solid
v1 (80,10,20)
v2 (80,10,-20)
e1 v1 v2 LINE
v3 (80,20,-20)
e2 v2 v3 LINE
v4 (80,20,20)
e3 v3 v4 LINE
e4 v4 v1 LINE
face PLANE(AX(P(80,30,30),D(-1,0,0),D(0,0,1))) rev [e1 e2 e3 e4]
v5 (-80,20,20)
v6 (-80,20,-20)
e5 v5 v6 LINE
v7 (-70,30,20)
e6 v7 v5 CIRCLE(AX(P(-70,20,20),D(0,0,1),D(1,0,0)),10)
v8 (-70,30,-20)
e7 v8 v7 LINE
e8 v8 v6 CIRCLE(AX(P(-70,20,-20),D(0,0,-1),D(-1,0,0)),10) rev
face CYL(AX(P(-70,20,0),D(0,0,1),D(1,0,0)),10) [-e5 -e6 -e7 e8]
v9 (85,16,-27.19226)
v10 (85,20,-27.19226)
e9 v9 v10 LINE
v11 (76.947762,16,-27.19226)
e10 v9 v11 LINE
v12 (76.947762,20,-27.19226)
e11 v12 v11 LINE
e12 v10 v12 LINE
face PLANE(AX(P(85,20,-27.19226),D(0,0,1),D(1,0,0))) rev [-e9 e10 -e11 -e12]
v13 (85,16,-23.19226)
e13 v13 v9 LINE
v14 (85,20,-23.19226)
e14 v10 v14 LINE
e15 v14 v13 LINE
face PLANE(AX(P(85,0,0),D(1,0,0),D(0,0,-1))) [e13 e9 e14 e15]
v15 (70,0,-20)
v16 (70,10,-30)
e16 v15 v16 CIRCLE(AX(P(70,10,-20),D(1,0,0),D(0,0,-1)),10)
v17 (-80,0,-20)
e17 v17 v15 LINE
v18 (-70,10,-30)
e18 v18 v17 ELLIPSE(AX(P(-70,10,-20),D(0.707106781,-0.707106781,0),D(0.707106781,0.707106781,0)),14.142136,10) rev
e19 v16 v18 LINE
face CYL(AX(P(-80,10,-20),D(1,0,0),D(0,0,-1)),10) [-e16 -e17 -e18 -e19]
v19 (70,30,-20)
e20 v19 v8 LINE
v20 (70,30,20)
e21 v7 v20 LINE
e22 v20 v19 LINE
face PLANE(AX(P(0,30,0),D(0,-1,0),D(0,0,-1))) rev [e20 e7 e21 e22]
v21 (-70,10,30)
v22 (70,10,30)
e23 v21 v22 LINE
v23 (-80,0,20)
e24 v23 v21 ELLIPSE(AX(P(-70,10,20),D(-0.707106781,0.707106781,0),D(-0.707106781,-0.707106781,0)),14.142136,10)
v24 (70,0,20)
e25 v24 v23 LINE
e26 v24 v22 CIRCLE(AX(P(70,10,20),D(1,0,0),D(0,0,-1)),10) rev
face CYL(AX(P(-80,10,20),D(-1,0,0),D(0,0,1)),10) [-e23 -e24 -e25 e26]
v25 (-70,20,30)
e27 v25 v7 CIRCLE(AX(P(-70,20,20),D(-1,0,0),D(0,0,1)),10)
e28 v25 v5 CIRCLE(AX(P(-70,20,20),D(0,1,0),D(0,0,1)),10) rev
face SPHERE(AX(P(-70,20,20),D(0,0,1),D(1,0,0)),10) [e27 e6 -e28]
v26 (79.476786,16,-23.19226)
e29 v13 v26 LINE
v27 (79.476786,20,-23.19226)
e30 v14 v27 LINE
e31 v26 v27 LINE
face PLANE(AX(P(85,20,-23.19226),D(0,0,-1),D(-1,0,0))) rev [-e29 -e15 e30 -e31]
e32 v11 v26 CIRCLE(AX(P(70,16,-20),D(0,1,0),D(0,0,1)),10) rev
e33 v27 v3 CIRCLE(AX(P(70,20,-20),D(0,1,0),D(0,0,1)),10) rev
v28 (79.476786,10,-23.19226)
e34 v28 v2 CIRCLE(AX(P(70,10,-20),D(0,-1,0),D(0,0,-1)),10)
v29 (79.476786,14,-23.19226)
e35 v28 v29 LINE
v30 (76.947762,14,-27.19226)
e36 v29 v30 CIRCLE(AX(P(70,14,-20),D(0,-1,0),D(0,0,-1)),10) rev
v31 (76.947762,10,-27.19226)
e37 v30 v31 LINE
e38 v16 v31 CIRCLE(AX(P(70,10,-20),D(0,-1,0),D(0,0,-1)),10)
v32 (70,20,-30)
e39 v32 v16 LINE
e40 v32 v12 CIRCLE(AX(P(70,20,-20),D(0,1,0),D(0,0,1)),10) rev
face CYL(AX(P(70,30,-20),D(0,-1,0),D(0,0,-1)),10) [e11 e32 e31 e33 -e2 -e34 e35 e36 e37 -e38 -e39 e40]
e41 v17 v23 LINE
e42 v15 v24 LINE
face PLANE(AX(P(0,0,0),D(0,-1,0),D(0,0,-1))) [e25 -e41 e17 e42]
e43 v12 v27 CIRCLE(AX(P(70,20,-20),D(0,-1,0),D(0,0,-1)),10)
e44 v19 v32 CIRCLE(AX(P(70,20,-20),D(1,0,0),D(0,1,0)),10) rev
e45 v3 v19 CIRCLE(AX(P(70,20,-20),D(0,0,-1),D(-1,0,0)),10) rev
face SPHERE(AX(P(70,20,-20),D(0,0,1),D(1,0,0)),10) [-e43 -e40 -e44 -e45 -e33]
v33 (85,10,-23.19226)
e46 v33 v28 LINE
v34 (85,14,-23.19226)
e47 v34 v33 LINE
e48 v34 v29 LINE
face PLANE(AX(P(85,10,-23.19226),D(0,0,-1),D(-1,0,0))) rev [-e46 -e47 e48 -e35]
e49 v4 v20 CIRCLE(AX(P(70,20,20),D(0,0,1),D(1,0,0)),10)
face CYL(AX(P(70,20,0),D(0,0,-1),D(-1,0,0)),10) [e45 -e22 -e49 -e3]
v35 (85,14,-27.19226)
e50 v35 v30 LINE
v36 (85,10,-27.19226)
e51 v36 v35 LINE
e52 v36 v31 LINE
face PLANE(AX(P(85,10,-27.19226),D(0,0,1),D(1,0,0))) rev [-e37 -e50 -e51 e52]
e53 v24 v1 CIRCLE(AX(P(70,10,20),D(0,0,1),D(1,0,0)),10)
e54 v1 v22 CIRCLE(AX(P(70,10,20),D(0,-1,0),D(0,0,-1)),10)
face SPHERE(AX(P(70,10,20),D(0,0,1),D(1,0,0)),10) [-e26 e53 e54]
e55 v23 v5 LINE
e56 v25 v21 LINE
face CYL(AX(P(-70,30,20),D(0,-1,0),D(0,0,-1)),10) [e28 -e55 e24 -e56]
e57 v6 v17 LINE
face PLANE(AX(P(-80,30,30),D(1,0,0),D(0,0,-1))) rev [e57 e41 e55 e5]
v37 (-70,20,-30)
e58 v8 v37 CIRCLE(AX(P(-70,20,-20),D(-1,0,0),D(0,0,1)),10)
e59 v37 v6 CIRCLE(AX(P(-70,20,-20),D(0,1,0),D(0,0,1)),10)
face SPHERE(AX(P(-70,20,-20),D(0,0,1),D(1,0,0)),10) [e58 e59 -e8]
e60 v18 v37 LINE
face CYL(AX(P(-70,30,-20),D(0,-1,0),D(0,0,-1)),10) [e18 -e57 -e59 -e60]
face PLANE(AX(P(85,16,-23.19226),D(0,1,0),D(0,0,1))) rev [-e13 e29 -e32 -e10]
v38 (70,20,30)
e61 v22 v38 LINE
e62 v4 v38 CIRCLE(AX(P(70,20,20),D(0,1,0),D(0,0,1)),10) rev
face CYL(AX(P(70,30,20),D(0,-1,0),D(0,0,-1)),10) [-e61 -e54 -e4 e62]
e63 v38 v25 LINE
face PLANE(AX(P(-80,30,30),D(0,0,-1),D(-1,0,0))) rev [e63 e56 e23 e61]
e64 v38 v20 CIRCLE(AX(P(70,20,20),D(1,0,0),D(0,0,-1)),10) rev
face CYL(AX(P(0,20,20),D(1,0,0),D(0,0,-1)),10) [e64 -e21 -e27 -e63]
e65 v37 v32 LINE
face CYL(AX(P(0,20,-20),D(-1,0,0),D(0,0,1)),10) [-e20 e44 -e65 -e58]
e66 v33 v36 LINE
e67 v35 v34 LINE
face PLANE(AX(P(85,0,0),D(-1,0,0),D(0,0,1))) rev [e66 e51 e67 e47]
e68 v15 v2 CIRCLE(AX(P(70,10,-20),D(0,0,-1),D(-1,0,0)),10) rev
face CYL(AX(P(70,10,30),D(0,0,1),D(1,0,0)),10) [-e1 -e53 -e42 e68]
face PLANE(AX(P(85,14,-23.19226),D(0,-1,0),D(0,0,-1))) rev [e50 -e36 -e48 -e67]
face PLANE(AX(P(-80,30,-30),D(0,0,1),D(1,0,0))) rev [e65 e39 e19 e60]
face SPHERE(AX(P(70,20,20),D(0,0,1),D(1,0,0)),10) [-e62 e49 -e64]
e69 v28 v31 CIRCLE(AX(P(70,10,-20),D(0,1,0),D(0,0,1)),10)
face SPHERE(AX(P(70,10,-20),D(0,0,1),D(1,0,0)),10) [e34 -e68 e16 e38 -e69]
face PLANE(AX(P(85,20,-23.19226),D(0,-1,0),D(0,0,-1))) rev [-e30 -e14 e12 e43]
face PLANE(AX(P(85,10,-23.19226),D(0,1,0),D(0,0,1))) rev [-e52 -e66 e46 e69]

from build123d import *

# Parameters (mm, degrees)
ESQUISSE1_W        = 160
ESQUISSE1_H        = 60
BOSS_EXTRU_1_DEPTH = 30
ESQUISSE2_W        = 4
ESQUISSE2_H        = 4
BOSS_EXTRU_2_DEPTH = 5
CONG_1_R           = 10


with BuildPart() as part:
    # Esquisse1 → Boss.-Extru.1 (new body)
    with BuildSketch(Plane(origin=(0, 0, 0), x_dir=(1, 0, 0), z_dir=(0, 1, 0))):
        Rectangle(ESQUISSE1_W, ESQUISSE1_H)
    extrude(amount=BOSS_EXTRU_1_DEPTH)

    # Esquisse2 → Boss.-Extru.2 (add)
    with BuildSketch(Plane(origin=(80, 0, 0), x_dir=(0, 0, -1), z_dir=(1, 0, 0))):
        with Locations((25.192260315, 18)):
            Rectangle(ESQUISSE2_W, ESQUISSE2_H)
        with Locations((25.192260315, 12)):
            Rectangle(ESQUISSE2_W, ESQUISSE2_H)
    extrude(amount=BOSS_EXTRU_2_DEPTH)

    # Congé1
    # the kernel refuses this fillet: 10 mm, written as the material it takes off along each edge
    with BuildSketch(Plane(origin=(-70, 20, 20), x_dir=(-1, 0, 0), z_dir=(0, 0, 1))) as cong_1_piece_1_section:
        Polygon((0, 0), (CONG_1_R * 1.02, 0), (CONG_1_R * 1.02, -CONG_1_R * 1.02), (0, -CONG_1_R * 1.02), align=None)
    cong_1_piece_1 = extrude(amount=CONG_1_R * 1.02, mode=Mode.PRIVATE)
    cong_1_piece_1 = cong_1_piece_1 - Plane(origin=(-70, 20, 20), x_dir=(0.7071067811865475, -0.7071067811865475, 0), z_dir=(0, 0, 1)) * Sphere(CONG_1_R, mode=Mode.PRIVATE)
    add(cong_1_piece_1, mode=Mode.SUBTRACT)
    with BuildSketch(Plane(origin=(-70, 20, -20), x_dir=(0, 1, 0), z_dir=(-1, 0, 0))) as cong_1_piece_2_section:
        Polygon((0, 0), (CONG_1_R * 1.02, 0), (CONG_1_R * 1.02, CONG_1_R * 1.02), (0, CONG_1_R * 1.02), align=None)
    cong_1_piece_2 = extrude(amount=CONG_1_R * 1.02, mode=Mode.PRIVATE)
    cong_1_piece_2 = cong_1_piece_2 - Plane(origin=(-70, 20, -20), x_dir=(0, -0.7071067811865475, 0.7071067811865475), z_dir=(-1, 0, 0)) * Sphere(CONG_1_R, mode=Mode.PRIVATE)
    add(cong_1_piece_2, mode=Mode.SUBTRACT)
    with BuildSketch(Plane(origin=(70, 10, -20), x_dir=(0, -1, 0), z_dir=(1, 0, 0))) as cong_1_piece_3_section:
        Polygon((0, 0), (CONG_1_R * 1.02, 0), (CONG_1_R * 1.02, CONG_1_R * 1.02), (0, CONG_1_R * 1.02), align=None)
    cong_1_piece_3 = extrude(amount=CONG_1_R * 1.02, mode=Mode.PRIVATE)
    cong_1_piece_3 = cong_1_piece_3 - Plane(origin=(70, 10, -20), x_dir=(0, 0.7071067811865475, 0.7071067811865475), z_dir=(1, 0, 0)) * Sphere(CONG_1_R, mode=Mode.PRIVATE)
    add(cong_1_piece_3, mode=Mode.SUBTRACT)
    with BuildSketch(Plane(origin=(70, 20, -20), x_dir=(0, 1, 0), z_dir=(1, 0, 0))) as cong_1_piece_4_section:
        Polygon((0, 0), (CONG_1_R * 1.02, 0), (CONG_1_R * 1.02, -CONG_1_R * 1.02), (0, -CONG_1_R * 1.02), align=None)
    cong_1_piece_4 = extrude(amount=CONG_1_R * 1.02, mode=Mode.PRIVATE)
    cong_1_piece_4 = cong_1_piece_4 - Plane(origin=(70, 20, -20), x_dir=(0, -0.7071067811865475, 0.7071067811865475), z_dir=(1, 0, 0)) * Sphere(CONG_1_R, mode=Mode.PRIVATE)
    add(cong_1_piece_4, mode=Mode.SUBTRACT)
    with BuildSketch(Plane(origin=(70, 10, 20), x_dir=(1, 0, 0), z_dir=(0, 0, 1))) as cong_1_piece_5_section:
        Polygon((0, 0), (CONG_1_R * 1.02, 0), (CONG_1_R * 1.02, -CONG_1_R * 1.02), (0, -CONG_1_R * 1.02), align=None)
    cong_1_piece_5 = extrude(amount=CONG_1_R * 1.02, mode=Mode.PRIVATE)
    cong_1_piece_5 = cong_1_piece_5 - Plane(origin=(70, 10, 20), x_dir=(-0.7071067811865475, 0.7071067811865475, 0), z_dir=(0, 0, 1)) * Sphere(CONG_1_R, mode=Mode.PRIVATE)
    add(cong_1_piece_5, mode=Mode.SUBTRACT)
    with BuildSketch(Plane(origin=(70, 20, 20), x_dir=(1, 0, 0), z_dir=(0, 0, 1))) as cong_1_piece_6_section:
        Polygon((0, 0), (CONG_1_R * 1.02, 0), (CONG_1_R * 1.02, CONG_1_R * 1.02), (0, CONG_1_R * 1.02), align=None)
    cong_1_piece_6 = extrude(amount=CONG_1_R * 1.02, mode=Mode.PRIVATE)
    cong_1_piece_6 = cong_1_piece_6 - Plane(origin=(70, 20, 20), x_dir=(-0.7071067811865475, -0.7071067811865475, 0), z_dir=(0, 0, 1)) * Sphere(CONG_1_R, mode=Mode.PRIVATE)
    add(cong_1_piece_6, mode=Mode.SUBTRACT)
    with BuildSketch(Plane(origin=(-80, -25, 30), x_dir=(1, 0, 0), z_dir=(0, 1, 0)), Plane(origin=(-80, -25, -30), x_dir=(0, 0, 1), z_dir=(0, 1, 0))) as cong_1_piece_7:
        with BuildLine():
            CenterArc((CONG_1_R, CONG_1_R), CONG_1_R, 180, 90)
            Line((0, CONG_1_R), (0, 0))
            Line((0, 0), (CONG_1_R, 0))
        make_face()
    extrude(amount=45, mode=Mode.SUBTRACT)
    with BuildSketch(Plane(origin=(70, 0, -30), x_dir=(0, 0, 1), z_dir=(-1, 0, 0))) as cong_1_piece_8:
        with BuildLine():
            CenterArc((CONG_1_R, CONG_1_R), CONG_1_R, 180, 90)
            Line((0, CONG_1_R), (0, 0))
            Line((0, 0), (CONG_1_R, 0))
        make_face()
    extrude(amount=175, mode=Mode.SUBTRACT)
    with BuildSketch(Plane(origin=(80, 10, -30), x_dir=(0, 0, 1), z_dir=(0, 1, 0))) as cong_1_piece_9_section:
        with BuildLine():
            CenterArc((CONG_1_R, -CONG_1_R), CONG_1_R, 90, 90)
            Line((0, -CONG_1_R), (0, 0))
            Line((0, 0), (CONG_1_R, 0))
        make_face()
    cong_1_piece_9 = extrude(amount=10, mode=Mode.PRIVATE)
    cong_1_piece_9 = split(cong_1_piece_9, bisect_by=Plane(origin=(79.843765754, 12, -23.192260315), z_dir=(0, 0, 1)), keep=Keep.TOP, mode=Mode.PRIVATE)
    add(cong_1_piece_9, mode=Mode.SUBTRACT)
    with BuildSketch(Plane(origin=(80, 10, -30), x_dir=(0, 0, 1), z_dir=(0, 1, 0))) as cong_1_piece_10_section:
        with BuildLine():
            CenterArc((CONG_1_R, -CONG_1_R), CONG_1_R, 90, 90)
            Line((0, -CONG_1_R), (0, 0))
            Line((0, 0), (CONG_1_R, 0))
        make_face()
    cong_1_piece_10 = extrude(amount=10, mode=Mode.PRIVATE)
    cong_1_piece_10 = split(cong_1_piece_10, bisect_by=Plane(origin=(77.140541655, 12, -27.192260315), z_dir=(0, 0, -1)), keep=Keep.TOP, mode=Mode.PRIVATE)
    add(cong_1_piece_10, mode=Mode.SUBTRACT)
    with BuildSketch(Plane(origin=(80, 10, -30), x_dir=(0, 0, 1), z_dir=(0, 1, 0))) as cong_1_piece_11_section:
        with BuildLine():
            CenterArc((CONG_1_R, -CONG_1_R), CONG_1_R, 90, 90)
            Line((0, -CONG_1_R), (0, 0))
            Line((0, 0), (CONG_1_R, 0))
        make_face()
    cong_1_piece_11 = extrude(amount=10, mode=Mode.PRIVATE)
    cong_1_piece_11 = split(cong_1_piece_11, bisect_by=Plane(origin=(79.050284637, 16, -25.722845845), z_dir=(0, -1, 0)), keep=Keep.TOP, mode=Mode.PRIVATE)
    cong_1_piece_11 = split(cong_1_piece_11, bisect_by=Plane(origin=(79.050284637, 14, -25.722845845), z_dir=(0, 1, 0)), keep=Keep.TOP, mode=Mode.PRIVATE)
    add(cong_1_piece_11, mode=Mode.SUBTRACT)
    with BuildSketch(Plane(origin=(80, 0, 20), x_dir=(0, 1, 0), z_dir=(0, 0, -1))) as cong_1_piece_12:
        with BuildLine():
            CenterArc((CONG_1_R, -CONG_1_R), CONG_1_R, 90, 90)
            Line((0, -CONG_1_R), (0, 0))
            Line((0, 0), (CONG_1_R, 0))
        make_face()
    extrude(amount=40, mode=Mode.SUBTRACT)
    with BuildSketch(Plane(origin=(80, 30, 20), x_dir=(0, -1, 0), z_dir=(0, 0, -1)), Plane(origin=(-80, 30, -20), x_dir=(0, -1, 0), z_dir=(0, 0, 1))) as cong_1_piece_13:
        with BuildLine():
            CenterArc((CONG_1_R, CONG_1_R), CONG_1_R, 180, 90)
            Line((0, CONG_1_R), (0, 0))
            Line((0, 0), (CONG_1_R, 0))
        make_face()
    extrude(amount=40, mode=Mode.SUBTRACT)
    with BuildSketch(Plane(origin=(70, 30, -30), x_dir=(0, 0, 1), z_dir=(-1, 0, 0))) as cong_1_piece_14:
        with BuildLine():
            CenterArc((CONG_1_R, -CONG_1_R), CONG_1_R, 90, 90)
            Line((0, -CONG_1_R), (0, 0))
            Line((0, 0), (CONG_1_R, 0))
        make_face()
    extrude(amount=140, mode=Mode.SUBTRACT)
    with BuildSketch(Plane(origin=(80, 10, 30), x_dir=(-1, 0, 0), z_dir=(0, 1, 0))) as cong_1_piece_15:
        with BuildLine():
            CenterArc((CONG_1_R, -CONG_1_R), CONG_1_R, 90, 90)
            Line((0, -CONG_1_R), (0, 0))
            Line((0, 0), (CONG_1_R, 0))
        make_face()
    extrude(amount=10, mode=Mode.SUBTRACT)
    with BuildSketch(Plane(origin=(-105, 0, 30), x_dir=(0, 1, 0), z_dir=(1, 0, 0))) as cong_1_piece_16:
        with BuildLine():
            CenterArc((CONG_1_R, -CONG_1_R), CONG_1_R, 90, 90)
            Line((0, -CONG_1_R), (0, 0))
            Line((0, 0), (CONG_1_R, 0))
        make_face()
    extrude(amount=175, mode=Mode.SUBTRACT)
    with BuildSketch(Plane(origin=(-70, 30, 30), x_dir=(0, -1, 0), z_dir=(1, 0, 0))) as cong_1_piece_17:
        with BuildLine():
            CenterArc((CONG_1_R, CONG_1_R), CONG_1_R, 180, 90)
            Line((0, CONG_1_R), (0, 0))
            Line((0, 0), (CONG_1_R, 0))
        make_face()
    extrude(amount=140, mode=Mode.SUBTRACT)


solid = part.part
